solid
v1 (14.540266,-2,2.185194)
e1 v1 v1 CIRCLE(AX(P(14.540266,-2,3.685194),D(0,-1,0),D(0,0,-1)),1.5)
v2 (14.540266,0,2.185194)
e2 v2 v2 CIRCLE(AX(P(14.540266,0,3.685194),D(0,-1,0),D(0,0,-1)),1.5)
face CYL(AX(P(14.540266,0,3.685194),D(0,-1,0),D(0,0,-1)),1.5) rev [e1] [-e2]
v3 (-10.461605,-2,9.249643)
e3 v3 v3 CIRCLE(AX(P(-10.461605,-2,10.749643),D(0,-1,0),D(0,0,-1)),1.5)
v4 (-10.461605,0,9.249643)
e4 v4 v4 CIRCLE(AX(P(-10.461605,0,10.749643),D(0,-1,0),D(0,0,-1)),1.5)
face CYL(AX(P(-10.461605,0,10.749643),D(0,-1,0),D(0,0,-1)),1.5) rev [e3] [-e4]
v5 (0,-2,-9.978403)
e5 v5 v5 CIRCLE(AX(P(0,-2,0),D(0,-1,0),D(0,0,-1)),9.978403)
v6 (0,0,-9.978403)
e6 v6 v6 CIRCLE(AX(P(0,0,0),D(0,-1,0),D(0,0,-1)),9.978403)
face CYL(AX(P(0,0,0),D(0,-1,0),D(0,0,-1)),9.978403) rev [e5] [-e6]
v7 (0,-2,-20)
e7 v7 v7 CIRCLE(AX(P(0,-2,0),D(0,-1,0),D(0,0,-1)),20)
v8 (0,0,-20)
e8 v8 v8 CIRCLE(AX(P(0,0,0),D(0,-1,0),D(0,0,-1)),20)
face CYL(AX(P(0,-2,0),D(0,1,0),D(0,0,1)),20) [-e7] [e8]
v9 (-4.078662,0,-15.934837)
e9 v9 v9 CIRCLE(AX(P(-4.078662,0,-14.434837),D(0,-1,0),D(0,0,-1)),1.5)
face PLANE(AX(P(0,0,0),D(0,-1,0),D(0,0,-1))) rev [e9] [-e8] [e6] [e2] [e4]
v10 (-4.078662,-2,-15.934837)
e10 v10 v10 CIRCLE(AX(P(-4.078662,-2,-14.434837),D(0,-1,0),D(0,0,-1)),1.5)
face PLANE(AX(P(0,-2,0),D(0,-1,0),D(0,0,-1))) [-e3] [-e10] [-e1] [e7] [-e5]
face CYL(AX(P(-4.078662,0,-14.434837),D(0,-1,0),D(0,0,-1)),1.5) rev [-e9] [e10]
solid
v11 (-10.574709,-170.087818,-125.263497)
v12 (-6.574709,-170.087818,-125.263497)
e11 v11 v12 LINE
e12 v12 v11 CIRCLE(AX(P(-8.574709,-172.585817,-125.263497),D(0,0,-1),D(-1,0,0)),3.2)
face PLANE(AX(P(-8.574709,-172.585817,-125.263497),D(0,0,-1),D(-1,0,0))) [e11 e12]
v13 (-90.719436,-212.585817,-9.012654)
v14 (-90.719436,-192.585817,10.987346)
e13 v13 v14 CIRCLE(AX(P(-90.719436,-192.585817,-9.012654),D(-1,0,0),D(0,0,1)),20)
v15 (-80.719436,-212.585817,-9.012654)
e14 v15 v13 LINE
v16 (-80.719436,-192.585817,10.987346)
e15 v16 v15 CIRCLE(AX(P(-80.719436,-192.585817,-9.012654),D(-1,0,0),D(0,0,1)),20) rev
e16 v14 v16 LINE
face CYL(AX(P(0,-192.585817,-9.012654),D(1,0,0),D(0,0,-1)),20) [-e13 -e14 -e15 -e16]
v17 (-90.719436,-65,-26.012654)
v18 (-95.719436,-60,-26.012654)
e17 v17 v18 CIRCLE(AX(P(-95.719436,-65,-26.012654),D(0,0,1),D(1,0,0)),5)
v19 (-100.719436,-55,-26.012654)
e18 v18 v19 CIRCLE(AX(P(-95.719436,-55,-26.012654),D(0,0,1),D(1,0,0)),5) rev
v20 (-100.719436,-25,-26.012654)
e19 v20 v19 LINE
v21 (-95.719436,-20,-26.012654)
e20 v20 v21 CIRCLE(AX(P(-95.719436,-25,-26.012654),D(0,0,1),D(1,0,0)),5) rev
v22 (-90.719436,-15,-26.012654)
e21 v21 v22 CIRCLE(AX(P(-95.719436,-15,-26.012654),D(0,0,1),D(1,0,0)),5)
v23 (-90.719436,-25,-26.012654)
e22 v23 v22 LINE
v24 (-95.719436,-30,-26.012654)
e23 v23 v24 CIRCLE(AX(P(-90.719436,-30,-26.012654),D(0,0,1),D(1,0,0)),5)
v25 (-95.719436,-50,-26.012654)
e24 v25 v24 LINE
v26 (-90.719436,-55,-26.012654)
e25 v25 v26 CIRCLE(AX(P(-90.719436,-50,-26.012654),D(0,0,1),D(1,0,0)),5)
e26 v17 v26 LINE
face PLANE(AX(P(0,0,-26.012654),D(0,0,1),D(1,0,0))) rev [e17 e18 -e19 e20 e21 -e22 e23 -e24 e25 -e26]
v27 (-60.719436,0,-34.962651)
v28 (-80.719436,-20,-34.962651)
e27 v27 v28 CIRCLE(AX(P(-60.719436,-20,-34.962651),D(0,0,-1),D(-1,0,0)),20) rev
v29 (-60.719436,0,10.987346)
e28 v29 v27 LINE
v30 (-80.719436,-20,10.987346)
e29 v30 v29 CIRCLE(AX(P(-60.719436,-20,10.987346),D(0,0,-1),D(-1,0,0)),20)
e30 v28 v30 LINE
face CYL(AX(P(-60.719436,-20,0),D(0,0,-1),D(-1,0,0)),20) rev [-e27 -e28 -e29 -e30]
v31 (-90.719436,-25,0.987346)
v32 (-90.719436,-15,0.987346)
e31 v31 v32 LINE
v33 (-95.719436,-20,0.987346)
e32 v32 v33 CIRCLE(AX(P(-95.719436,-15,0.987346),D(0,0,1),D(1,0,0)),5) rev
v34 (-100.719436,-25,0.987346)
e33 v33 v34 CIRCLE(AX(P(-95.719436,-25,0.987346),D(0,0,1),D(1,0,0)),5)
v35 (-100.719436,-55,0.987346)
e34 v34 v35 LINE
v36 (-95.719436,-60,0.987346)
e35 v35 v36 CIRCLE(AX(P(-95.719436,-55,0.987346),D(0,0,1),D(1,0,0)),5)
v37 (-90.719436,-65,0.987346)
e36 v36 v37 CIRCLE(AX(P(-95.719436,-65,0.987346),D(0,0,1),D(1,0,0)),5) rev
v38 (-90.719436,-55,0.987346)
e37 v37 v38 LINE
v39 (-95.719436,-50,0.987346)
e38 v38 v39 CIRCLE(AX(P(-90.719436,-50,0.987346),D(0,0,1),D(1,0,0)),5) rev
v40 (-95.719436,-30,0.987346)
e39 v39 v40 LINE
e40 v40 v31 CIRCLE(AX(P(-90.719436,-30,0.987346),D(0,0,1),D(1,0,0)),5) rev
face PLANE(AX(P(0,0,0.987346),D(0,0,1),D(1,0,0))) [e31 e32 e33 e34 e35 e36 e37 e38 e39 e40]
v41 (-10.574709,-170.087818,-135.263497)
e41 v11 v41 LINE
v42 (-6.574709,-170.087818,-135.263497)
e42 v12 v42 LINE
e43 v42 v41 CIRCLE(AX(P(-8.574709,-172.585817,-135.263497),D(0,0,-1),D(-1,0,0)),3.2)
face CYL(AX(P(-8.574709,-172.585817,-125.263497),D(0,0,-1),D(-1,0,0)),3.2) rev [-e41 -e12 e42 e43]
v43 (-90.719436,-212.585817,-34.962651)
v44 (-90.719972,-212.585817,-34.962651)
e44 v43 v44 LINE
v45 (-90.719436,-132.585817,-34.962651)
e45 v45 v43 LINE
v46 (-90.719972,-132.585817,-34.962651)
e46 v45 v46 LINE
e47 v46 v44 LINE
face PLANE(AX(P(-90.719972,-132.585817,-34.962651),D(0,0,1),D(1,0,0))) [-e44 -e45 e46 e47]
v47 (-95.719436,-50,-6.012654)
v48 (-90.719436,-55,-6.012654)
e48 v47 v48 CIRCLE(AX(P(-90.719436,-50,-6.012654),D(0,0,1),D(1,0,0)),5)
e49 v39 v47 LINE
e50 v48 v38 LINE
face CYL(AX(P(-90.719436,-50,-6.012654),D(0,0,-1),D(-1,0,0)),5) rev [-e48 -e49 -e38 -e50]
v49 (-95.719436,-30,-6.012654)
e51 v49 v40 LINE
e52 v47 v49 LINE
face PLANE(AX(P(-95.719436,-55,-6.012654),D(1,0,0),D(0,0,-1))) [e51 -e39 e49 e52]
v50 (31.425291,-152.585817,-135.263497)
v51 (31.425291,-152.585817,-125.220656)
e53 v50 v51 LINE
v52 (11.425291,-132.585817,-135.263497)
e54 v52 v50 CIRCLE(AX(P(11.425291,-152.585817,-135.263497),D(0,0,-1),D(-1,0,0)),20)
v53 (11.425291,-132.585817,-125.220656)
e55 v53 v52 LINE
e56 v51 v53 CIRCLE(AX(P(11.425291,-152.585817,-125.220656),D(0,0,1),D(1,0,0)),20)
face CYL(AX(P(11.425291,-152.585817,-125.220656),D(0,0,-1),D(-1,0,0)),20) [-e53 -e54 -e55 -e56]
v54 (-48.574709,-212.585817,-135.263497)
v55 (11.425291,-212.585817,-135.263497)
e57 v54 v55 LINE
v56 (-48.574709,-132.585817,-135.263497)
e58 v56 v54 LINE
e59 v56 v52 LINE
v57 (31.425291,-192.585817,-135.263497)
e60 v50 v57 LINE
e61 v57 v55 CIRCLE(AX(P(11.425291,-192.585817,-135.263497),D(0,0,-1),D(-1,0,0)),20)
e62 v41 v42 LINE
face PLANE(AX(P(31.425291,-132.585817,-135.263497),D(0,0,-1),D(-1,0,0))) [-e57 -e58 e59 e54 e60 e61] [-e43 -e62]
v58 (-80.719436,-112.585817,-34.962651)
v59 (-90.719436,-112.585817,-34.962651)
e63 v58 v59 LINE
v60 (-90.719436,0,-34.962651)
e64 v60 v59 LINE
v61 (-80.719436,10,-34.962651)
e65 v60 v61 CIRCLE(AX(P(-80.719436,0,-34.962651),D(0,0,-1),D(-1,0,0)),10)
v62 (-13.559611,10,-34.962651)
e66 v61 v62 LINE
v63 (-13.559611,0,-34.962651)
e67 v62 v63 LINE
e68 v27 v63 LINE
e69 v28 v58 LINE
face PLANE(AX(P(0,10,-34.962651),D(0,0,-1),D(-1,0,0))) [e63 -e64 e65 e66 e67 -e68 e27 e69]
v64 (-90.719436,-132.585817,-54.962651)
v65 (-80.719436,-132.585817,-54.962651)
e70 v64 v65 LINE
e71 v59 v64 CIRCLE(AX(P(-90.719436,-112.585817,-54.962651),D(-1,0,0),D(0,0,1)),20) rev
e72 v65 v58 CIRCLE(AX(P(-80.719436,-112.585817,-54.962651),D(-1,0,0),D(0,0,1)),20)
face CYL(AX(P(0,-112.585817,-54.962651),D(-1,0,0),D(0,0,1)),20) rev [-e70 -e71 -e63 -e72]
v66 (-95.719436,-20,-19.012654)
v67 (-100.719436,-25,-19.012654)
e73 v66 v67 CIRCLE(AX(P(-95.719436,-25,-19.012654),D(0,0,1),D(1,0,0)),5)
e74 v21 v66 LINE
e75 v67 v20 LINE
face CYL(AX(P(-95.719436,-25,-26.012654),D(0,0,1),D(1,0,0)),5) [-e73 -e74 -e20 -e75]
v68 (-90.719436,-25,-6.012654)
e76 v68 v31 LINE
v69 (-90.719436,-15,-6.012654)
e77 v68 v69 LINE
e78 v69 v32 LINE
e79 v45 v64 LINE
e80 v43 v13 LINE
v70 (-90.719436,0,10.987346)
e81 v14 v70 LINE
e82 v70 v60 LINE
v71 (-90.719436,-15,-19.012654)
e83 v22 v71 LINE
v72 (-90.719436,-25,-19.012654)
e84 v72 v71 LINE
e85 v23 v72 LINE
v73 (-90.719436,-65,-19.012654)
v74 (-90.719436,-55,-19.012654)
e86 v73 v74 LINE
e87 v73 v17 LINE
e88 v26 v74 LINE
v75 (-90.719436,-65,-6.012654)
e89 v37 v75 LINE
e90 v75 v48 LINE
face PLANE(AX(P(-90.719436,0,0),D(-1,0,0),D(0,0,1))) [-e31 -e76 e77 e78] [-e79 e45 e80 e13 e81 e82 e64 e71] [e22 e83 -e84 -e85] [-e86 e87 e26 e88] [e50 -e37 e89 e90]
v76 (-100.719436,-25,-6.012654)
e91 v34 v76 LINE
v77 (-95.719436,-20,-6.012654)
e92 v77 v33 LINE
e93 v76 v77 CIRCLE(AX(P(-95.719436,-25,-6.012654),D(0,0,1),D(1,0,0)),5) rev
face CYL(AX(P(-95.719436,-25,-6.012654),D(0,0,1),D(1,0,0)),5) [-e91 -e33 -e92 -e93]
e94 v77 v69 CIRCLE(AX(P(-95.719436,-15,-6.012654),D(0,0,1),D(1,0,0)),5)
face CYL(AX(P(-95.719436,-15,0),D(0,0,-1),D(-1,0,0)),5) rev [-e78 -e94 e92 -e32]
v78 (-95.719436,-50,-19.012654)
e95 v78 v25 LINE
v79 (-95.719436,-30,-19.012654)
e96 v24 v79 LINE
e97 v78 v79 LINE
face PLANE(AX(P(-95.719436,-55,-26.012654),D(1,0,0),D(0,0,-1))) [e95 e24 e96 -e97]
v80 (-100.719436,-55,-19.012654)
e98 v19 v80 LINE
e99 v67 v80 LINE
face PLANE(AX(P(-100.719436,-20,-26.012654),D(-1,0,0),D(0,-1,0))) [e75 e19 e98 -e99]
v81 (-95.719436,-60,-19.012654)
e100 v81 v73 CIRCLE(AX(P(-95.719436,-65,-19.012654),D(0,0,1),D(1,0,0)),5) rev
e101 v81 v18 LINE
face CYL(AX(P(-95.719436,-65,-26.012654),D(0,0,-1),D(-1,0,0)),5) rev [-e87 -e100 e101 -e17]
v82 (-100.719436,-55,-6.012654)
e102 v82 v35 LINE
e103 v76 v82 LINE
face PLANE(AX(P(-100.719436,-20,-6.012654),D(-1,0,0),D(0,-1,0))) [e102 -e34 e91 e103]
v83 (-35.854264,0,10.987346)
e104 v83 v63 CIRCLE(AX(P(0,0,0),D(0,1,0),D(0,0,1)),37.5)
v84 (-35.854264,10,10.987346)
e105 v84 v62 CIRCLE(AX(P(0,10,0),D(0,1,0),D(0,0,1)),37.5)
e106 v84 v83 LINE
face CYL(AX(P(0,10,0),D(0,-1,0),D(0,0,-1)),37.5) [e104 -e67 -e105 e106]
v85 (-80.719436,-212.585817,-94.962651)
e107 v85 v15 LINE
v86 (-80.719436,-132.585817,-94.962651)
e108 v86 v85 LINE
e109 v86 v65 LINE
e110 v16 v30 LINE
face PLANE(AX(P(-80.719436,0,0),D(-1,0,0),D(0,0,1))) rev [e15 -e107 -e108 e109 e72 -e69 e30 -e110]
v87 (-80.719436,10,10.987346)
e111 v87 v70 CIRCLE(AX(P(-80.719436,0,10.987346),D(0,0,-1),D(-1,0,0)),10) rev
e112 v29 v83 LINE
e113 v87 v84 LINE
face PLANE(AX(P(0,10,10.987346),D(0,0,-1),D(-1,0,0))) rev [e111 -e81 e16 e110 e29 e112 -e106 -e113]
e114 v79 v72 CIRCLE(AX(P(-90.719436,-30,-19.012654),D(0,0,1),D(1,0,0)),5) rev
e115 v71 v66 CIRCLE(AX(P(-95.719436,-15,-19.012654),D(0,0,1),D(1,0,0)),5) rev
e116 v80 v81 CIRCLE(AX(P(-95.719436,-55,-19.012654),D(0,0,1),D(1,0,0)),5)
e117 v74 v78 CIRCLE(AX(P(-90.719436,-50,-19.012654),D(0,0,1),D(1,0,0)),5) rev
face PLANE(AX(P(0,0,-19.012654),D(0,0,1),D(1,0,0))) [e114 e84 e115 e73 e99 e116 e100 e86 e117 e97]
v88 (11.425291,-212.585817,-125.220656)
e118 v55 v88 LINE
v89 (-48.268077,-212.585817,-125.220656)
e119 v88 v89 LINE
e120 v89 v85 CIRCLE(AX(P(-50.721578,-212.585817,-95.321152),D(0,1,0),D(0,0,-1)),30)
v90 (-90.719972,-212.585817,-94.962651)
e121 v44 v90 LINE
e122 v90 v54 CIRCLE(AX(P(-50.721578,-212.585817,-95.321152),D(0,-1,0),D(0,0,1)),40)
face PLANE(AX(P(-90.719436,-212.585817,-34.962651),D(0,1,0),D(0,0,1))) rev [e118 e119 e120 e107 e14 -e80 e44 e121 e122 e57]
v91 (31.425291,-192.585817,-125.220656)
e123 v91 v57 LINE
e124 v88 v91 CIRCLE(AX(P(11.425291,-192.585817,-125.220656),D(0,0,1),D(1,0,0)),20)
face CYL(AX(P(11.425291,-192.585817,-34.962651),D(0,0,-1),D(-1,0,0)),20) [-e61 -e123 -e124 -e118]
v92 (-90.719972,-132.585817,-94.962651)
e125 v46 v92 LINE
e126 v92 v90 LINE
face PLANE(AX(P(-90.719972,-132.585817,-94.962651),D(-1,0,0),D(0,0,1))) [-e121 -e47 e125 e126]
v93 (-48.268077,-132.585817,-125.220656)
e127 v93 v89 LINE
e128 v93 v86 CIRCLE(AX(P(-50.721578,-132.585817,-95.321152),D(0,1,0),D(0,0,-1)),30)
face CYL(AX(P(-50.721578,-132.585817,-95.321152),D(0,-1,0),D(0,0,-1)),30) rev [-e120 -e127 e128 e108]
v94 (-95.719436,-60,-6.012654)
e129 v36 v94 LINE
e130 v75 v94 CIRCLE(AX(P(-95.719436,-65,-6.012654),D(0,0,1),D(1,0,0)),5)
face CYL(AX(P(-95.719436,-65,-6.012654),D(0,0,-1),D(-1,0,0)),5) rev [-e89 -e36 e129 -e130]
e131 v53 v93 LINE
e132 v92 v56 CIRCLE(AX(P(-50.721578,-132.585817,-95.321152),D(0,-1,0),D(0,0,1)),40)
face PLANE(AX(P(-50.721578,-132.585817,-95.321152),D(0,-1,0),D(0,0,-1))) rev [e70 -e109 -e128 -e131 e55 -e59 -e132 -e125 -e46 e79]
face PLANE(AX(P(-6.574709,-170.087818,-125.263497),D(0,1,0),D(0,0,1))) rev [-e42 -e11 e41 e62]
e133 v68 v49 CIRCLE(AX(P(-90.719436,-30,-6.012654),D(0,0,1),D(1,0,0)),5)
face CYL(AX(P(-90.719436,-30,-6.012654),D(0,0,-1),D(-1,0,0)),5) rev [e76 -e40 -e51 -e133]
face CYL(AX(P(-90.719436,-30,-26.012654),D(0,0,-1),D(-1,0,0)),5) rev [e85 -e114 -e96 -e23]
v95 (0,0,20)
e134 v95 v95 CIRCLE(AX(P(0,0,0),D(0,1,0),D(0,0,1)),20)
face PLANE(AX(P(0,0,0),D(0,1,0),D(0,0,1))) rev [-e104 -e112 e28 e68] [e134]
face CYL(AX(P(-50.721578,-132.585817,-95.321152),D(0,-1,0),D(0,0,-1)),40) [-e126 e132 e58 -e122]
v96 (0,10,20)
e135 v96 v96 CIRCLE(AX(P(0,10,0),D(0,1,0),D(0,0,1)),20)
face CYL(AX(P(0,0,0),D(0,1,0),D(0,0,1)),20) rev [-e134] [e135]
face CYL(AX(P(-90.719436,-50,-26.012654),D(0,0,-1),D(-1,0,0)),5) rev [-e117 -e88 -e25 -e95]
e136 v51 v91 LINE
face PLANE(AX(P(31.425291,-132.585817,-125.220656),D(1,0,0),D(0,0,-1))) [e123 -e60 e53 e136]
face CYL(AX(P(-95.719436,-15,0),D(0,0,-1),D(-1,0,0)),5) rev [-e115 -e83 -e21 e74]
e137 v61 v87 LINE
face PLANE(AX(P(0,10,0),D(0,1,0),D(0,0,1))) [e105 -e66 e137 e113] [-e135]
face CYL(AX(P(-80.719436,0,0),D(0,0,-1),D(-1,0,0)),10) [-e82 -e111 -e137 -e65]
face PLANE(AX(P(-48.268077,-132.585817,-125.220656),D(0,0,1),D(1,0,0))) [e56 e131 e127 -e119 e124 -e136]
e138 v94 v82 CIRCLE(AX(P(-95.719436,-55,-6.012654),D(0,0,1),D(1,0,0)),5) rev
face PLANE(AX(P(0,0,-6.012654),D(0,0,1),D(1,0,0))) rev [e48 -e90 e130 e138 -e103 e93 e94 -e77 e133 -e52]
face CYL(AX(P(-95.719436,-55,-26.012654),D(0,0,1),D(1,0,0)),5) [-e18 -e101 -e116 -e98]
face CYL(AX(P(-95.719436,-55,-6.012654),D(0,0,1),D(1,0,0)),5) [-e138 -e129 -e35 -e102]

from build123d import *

# Parameters (mm, degrees)
ESQUISSE3_R                = 37.5
BOSS_EXTRU_1_DEPTH         = 10
ESQUISSE4_R                = 20
ENL_V_MAT_EXTRU_1_DEPTH    = 10
ESQUISSE7_W                = 45.949997051
ESQUISSE7_H                = 222.585817195
BOSS_EXTRU_2_DEPTH         = 10
CONG_1_R                   = 10
BOSS_EXTRU_3_DEPTH         = 80
CONG_2_R                   = 20
ENL_V_MAT_EXTRU_2_DEPTH    = 10
BOSS_EXTRU_4_START         = -10
BOSS_EXTRU_4_DEPTH         = 7
CONG_3_R                   = 5
R_P_TITION_LIN_AIRE1_COUNT = 2
R_P_TITION_LIN_AIRE1_PITCH = 20
CONG_4_R                   = 5
ESQUISSE14_R               = 20
BOSS_EXTRU_5_DEPTH         = 2
ESQUISSE17_R               = 9.978403452
ESQUISSE17_R_2             = 1.5
ENL_V_MAT_EXTRU_9_DEPTH    = 2


with BuildPart() as part:
    # Esquisse3 → Boss.-Extru.1 (new body)
    with BuildSketch(Plane(origin=(0, 0, 0), x_dir=(1, 0, 0), z_dir=(0, 1, 0))):
        with BuildLine():
            Line((-13.559611376, 34.962650634), (-80.71943609, 34.962650634))
            Line((-80.71943609, 34.962650634), (-80.71943609, -10.987346417))
            Line((-80.71943609, -10.987346417), (-35.854263606, -10.987346417))
            ThreePointArc((-35.854263606, -10.987346417), (-33.73845458, 16.36968792), (-13.559611376, 34.962650634))
        make_face()
        Circle(ESQUISSE3_R)
    extrude(amount=BOSS_EXTRU_1_DEPTH)

    # Esquisse4 → Enlèv. mat.-Extru.1 (cut)
    with BuildSketch(Plane(origin=(0, 10, 0), x_dir=(1, 0, 0), z_dir=(0, 1, 0))):
        with Locations(Location((0, 0, 0), (0, 0, 270))):
            Circle(ESQUISSE4_R)
    extrude(amount=-ENL_V_MAT_EXTRU_1_DEPTH, mode=Mode.SUBTRACT)

    # Esquisse7 → Boss.-Extru.2 (add)
    with BuildSketch(Plane.ZY.offset(80.71943609)):
        with Locations((-11.987652108, -101.292908598)):
            Rectangle(ESQUISSE7_W, ESQUISSE7_H)
    extrude(amount=BOSS_EXTRU_2_DEPTH)

    # Congé1
    cong_1_edges = [part.edges().sort_by_distance(p)[0] for p in [
        (-90.71943609, 10, -11.987652108),
    ]]
    fillet(cong_1_edges, radius=CONG_1_R)

    # Esquisse8 → Boss.-Extru.3 (add)
    with BuildSketch(Plane.XZ.offset(212.585817195)):
        with BuildLine():
            Line((-80.71943609, -34.962650634), (-80.71943609, -94.962650634))
            ThreePointArc((-80.71943609, -94.962650634), (-71.180307706, -117.262901723), (-48.268076901, -125.220655707))
            Line((-48.268076901, -125.220655707), (31.425291459, -125.220655707))
            Line((31.425291459, -125.220655707), (31.425291459, -135.263497175))
            Line((31.425291459, -135.263497175), (-48.574708541, -135.263497175))
            ThreePointArc((-48.574708541, -135.263497175), (-78.366180233, -124.230942217), (-90.719971648, -94.962650634))
            Line((-90.719971648, -94.962650634), (-90.719971648, -34.962650634))
            Line((-90.719971648, -34.962650634), (-80.71943609, -34.962650634))
        make_face()
    extrude(amount=-BOSS_EXTRU_3_DEPTH)

    # Congé2
    cong_2_edges = [part.edges().sort_by_distance(p)[0] for p in [
        (-85.71943609, -212.585817195, 10.987346417),
        (-85.71943609, -132.585817195, -34.962650634),
        (31.425291459, -132.585817195, -130.242076441),
        (31.425291459, -212.585817195, -130.242076441),
        (-80.71943609, 0, -11.987652108),
    ]]
    fillet(cong_2_edges, radius=CONG_2_R)

    # Esquisse9 → Enlèv. mat.-Extru.2 (cut)
    with BuildSketch(Plane(origin=(0, 0, -135.263497175), x_dir=(-1, 0, 0), z_dir=(0, 0, -1))):
        with BuildLine():
            Line((6.574708541, -170.087817995), (10.574708541, -170.087817995))
            ThreePointArc((10.574708541, -170.087817995), (8.574708541, -175.785817195), (6.574708541, -170.087817995))
        make_face()
    extrude(amount=-ENL_V_MAT_EXTRU_2_DEPTH, mode=Mode.SUBTRACT)

    # Esquisse13 → Boss.-Extru.4 (add)
    with BuildSketch(Plane.XY.offset(10.987346417).offset(BOSS_EXTRU_4_START)):
        Polygon((-90.71943609, -20), (-100.71943609, -20), (-100.71943609, -60), (-90.71943609, -60), (-90.71943609, -55), (-95.71943609, -55), (-95.71943609, -25), (-90.71943609, -25), align=None)
    boss_extru_4 = extrude(amount=-BOSS_EXTRU_4_DEPTH)

    # Congé3
    cong_3_edges = [part.edges().sort_by_distance(p)[0] for p in [
        (-95.71943609, -25, -2.512653583),
        (-95.71943609, -55, -2.512653583),
        (-90.71943609, -60, -2.512653583),
        (-90.71943609, -20, -2.512653583),
        (-100.71943609, -60, -2.512653583),
        (-100.71943609, -20, -2.512653583),
    ]]
    fillet(cong_3_edges, radius=CONG_3_R - 0.0001)  # a hair under: the kernel refuses the full size

    # Répétition linéaire1: Boss.-Extru.4 ×2
    with Locations(*[(0, 0, -i * R_P_TITION_LIN_AIRE1_PITCH) for i in range(1, R_P_TITION_LIN_AIRE1_COUNT)]):
        add(boss_extru_4)

    # Congé4
    cong_4_edges = [part.edges().sort_by_distance(p)[0] for p in [
        (-95.71943609, -55, -22.512653583),
        (-95.71943609, -25, -22.512653583),
        (-90.71943609, -20, -22.512653583),
        (-100.71943609, -20, -22.512653583),
        (-90.71943609, -60, -22.512653583),
        (-100.71943609, -60, -22.512653583),
    ]]
    fillet(cong_4_edges, radius=CONG_4_R - 0.0001)  # a hair under: the kernel refuses the full size


with BuildPart() as body_2:
    # Esquisse14 → Boss.-Extru.5 (new body)
    with BuildSketch(Plane.XZ):
        with Locations(Location((0, 0, 0), (0, 0, 270))):
            Circle(ESQUISSE14_R)
    extrude(amount=BOSS_EXTRU_5_DEPTH)

    # Esquisse17 → Enlèv. mat.-Extru.9 (cut)
    with BuildSketch(Plane.XZ.offset(2)):
        with Locations(Location((0, 0, 0), (0, 0, 270))):
            Circle(ESQUISSE17_R)
        with Locations(Location((14.540266373, 3.685193863, 0), (0, 0, 270))):
            Circle(ESQUISSE17_R_2)
        with Locations(Location((-10.461604689, 10.749643125, 0), (0, 0, 270))):
            Circle(ESQUISSE17_R_2)
        with Locations(Location((-4.078661683, -14.434836988, 0), (0, 0, 270))):
            Circle(ESQUISSE17_R_2)
    extrude(amount=-ENL_V_MAT_EXTRU_9_DEPTH, mode=Mode.SUBTRACT)


solid = Compound([part.part, body_2.part])
